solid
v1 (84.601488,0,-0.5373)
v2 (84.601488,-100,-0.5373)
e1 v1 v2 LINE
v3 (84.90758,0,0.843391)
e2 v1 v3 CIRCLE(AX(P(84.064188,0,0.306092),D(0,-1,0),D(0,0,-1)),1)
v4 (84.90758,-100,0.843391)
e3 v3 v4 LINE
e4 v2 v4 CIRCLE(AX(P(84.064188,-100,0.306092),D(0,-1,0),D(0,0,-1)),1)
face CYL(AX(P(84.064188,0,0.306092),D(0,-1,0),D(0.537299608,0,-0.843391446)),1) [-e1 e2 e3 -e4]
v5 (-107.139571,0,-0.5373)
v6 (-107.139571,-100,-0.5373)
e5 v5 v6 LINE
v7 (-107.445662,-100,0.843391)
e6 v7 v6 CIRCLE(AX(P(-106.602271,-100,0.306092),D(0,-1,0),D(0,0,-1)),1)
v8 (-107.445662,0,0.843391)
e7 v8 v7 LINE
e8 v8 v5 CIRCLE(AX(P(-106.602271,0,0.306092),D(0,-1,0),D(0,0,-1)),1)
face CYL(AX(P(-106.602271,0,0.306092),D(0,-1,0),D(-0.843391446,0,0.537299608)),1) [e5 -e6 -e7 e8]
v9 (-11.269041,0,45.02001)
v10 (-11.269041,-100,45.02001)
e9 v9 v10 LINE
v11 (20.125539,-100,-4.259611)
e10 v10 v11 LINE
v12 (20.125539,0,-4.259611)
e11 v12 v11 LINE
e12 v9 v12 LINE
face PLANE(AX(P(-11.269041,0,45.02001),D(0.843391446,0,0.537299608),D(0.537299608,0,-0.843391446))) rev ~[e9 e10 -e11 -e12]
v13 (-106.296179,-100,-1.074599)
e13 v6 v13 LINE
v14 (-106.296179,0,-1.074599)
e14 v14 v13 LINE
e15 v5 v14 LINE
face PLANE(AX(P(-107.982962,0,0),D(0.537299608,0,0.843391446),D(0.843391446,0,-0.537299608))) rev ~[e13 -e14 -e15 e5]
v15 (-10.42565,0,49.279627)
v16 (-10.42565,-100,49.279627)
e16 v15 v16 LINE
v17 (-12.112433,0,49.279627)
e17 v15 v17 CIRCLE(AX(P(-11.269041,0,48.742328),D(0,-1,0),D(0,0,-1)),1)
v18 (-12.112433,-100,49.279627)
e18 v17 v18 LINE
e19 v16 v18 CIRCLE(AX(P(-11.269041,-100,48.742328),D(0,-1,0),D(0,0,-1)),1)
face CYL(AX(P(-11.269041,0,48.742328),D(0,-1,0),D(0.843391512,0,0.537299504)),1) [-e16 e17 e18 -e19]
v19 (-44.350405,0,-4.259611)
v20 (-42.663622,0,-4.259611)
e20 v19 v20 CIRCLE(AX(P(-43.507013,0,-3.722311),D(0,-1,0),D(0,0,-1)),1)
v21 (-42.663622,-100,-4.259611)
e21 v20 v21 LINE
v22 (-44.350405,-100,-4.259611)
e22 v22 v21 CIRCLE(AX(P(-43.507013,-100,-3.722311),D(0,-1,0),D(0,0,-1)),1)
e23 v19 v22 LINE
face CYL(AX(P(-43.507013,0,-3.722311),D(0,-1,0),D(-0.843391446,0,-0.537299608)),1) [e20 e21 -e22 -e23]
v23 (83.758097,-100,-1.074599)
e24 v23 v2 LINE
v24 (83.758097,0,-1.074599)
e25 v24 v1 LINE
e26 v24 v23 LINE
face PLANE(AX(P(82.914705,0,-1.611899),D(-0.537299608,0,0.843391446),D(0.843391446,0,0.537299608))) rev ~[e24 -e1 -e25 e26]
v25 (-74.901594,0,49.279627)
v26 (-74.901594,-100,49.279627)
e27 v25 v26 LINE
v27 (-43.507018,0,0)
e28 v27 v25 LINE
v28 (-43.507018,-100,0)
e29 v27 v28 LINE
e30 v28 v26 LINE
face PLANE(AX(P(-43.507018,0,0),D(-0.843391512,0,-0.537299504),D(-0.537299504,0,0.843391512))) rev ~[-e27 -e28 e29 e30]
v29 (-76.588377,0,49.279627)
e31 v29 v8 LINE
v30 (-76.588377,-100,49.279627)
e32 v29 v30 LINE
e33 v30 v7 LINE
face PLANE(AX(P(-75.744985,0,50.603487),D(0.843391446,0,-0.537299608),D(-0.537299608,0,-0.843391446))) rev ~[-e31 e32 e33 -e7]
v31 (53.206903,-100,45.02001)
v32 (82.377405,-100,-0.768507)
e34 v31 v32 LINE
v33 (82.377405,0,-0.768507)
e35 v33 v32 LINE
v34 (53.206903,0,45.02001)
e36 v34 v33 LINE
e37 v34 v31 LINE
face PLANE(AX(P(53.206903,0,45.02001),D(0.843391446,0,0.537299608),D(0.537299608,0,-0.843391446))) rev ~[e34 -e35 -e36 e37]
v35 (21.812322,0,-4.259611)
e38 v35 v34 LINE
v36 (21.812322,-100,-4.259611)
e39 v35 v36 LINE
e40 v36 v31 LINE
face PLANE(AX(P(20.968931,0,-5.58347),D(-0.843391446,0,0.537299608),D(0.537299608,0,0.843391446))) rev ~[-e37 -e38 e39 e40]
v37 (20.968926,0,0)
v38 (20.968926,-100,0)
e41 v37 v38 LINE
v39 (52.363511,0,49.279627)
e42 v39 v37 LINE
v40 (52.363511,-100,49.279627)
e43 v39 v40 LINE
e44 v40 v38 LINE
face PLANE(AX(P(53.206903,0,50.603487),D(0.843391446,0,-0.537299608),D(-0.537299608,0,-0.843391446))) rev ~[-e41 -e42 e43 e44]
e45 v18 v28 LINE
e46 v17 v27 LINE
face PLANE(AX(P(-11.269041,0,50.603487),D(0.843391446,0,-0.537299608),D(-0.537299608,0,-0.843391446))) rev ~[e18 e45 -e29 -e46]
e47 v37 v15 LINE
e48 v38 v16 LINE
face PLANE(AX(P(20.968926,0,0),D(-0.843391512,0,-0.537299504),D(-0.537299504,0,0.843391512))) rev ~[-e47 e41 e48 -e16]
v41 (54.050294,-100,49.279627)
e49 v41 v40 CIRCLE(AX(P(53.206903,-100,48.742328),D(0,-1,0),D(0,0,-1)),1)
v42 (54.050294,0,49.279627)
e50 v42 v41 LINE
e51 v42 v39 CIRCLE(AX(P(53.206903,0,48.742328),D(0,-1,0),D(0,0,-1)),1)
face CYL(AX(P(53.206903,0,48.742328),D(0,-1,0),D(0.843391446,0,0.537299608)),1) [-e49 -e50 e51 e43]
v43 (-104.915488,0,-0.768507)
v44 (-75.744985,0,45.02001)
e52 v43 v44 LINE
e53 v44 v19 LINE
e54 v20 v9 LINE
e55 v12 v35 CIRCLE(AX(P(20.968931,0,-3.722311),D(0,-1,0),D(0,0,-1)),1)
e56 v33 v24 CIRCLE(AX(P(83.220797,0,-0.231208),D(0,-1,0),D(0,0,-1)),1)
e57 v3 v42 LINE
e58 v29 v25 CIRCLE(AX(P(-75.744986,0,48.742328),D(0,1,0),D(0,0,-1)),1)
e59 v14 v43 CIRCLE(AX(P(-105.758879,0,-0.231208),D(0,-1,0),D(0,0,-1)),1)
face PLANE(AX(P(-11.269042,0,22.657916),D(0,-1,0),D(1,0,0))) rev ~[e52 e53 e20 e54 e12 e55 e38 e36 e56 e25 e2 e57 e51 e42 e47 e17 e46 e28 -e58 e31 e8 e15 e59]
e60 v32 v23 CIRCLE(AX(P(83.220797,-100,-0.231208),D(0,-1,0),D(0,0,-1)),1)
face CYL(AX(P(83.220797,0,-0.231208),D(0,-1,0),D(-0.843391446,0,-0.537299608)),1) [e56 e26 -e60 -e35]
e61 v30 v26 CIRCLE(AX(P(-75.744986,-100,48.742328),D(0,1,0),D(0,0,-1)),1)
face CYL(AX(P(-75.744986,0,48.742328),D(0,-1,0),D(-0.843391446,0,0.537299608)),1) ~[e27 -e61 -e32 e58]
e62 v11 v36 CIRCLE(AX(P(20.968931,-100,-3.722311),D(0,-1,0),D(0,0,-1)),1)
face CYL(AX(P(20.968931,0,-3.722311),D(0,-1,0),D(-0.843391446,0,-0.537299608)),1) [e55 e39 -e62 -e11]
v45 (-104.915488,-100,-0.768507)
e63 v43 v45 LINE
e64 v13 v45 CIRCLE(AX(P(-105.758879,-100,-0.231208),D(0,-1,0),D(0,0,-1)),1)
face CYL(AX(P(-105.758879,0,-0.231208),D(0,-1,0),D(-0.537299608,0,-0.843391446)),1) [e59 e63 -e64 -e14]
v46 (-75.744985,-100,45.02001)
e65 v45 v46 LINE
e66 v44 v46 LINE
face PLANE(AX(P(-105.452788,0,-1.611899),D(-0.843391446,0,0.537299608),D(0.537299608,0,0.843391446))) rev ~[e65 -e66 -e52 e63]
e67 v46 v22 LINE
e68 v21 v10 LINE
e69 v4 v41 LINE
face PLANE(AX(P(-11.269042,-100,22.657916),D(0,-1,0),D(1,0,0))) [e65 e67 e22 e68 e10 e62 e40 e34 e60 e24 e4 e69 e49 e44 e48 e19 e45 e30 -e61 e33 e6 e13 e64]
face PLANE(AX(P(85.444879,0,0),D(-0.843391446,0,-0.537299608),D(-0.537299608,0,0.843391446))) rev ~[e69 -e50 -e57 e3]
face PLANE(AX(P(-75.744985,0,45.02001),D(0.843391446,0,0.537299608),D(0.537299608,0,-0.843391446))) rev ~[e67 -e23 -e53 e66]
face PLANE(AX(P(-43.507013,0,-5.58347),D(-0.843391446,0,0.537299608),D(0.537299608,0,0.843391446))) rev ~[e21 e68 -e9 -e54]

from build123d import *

# Parameters (mm, degrees)
F1_DEPTH = 100
F2_R     = 1


# Not quite as in the source:
# - ends of sketch curves that miss each other by under 0.0002 mm in the source are joined


with BuildPart() as f1:
    # F0 (on Front) → F1 (new body)
    with BuildSketch(Plane.XZ):
        Polygon((-75.7449854628, 50.6034867488), (-107.9829619636, 0), (-105.4527876261, -1.611898825), (-75.7449854628, 45.0200097587), (-43.5070133628, -5.5834700822), (-11.2690412628, 45.0200097587), (20.9689308372, -5.5834700822), (53.2069029372, 45.0200097587), (82.9147051006, -1.611898825), (85.444879438, 0), (53.2069029372, 50.6034867488), (20.9689264364, 0), (-11.2690412628, 50.6034867488), (-43.5070177636, 0), align=None)
    extrude(amount=F1_DEPTH)

    # F2
    f2_edges = [f1.edges().sort_by_distance(p)[0] for p in [
        (53.206903, -50, 50.603487),
        (-11.269041, -50, 50.603487),
        (-75.744985, -50, 50.603487),
        (-43.507013, -50, -5.58347),
        (20.968931, -50, -5.58347),
        (82.914705, -50, -1.611899),
        (-105.452788, -50, -1.611899),
        (-107.982962, -50, 0),
        (85.444879, -50, 0),
    ]]
    fillet(f2_edges, radius=F2_R)


solid = f1.part
